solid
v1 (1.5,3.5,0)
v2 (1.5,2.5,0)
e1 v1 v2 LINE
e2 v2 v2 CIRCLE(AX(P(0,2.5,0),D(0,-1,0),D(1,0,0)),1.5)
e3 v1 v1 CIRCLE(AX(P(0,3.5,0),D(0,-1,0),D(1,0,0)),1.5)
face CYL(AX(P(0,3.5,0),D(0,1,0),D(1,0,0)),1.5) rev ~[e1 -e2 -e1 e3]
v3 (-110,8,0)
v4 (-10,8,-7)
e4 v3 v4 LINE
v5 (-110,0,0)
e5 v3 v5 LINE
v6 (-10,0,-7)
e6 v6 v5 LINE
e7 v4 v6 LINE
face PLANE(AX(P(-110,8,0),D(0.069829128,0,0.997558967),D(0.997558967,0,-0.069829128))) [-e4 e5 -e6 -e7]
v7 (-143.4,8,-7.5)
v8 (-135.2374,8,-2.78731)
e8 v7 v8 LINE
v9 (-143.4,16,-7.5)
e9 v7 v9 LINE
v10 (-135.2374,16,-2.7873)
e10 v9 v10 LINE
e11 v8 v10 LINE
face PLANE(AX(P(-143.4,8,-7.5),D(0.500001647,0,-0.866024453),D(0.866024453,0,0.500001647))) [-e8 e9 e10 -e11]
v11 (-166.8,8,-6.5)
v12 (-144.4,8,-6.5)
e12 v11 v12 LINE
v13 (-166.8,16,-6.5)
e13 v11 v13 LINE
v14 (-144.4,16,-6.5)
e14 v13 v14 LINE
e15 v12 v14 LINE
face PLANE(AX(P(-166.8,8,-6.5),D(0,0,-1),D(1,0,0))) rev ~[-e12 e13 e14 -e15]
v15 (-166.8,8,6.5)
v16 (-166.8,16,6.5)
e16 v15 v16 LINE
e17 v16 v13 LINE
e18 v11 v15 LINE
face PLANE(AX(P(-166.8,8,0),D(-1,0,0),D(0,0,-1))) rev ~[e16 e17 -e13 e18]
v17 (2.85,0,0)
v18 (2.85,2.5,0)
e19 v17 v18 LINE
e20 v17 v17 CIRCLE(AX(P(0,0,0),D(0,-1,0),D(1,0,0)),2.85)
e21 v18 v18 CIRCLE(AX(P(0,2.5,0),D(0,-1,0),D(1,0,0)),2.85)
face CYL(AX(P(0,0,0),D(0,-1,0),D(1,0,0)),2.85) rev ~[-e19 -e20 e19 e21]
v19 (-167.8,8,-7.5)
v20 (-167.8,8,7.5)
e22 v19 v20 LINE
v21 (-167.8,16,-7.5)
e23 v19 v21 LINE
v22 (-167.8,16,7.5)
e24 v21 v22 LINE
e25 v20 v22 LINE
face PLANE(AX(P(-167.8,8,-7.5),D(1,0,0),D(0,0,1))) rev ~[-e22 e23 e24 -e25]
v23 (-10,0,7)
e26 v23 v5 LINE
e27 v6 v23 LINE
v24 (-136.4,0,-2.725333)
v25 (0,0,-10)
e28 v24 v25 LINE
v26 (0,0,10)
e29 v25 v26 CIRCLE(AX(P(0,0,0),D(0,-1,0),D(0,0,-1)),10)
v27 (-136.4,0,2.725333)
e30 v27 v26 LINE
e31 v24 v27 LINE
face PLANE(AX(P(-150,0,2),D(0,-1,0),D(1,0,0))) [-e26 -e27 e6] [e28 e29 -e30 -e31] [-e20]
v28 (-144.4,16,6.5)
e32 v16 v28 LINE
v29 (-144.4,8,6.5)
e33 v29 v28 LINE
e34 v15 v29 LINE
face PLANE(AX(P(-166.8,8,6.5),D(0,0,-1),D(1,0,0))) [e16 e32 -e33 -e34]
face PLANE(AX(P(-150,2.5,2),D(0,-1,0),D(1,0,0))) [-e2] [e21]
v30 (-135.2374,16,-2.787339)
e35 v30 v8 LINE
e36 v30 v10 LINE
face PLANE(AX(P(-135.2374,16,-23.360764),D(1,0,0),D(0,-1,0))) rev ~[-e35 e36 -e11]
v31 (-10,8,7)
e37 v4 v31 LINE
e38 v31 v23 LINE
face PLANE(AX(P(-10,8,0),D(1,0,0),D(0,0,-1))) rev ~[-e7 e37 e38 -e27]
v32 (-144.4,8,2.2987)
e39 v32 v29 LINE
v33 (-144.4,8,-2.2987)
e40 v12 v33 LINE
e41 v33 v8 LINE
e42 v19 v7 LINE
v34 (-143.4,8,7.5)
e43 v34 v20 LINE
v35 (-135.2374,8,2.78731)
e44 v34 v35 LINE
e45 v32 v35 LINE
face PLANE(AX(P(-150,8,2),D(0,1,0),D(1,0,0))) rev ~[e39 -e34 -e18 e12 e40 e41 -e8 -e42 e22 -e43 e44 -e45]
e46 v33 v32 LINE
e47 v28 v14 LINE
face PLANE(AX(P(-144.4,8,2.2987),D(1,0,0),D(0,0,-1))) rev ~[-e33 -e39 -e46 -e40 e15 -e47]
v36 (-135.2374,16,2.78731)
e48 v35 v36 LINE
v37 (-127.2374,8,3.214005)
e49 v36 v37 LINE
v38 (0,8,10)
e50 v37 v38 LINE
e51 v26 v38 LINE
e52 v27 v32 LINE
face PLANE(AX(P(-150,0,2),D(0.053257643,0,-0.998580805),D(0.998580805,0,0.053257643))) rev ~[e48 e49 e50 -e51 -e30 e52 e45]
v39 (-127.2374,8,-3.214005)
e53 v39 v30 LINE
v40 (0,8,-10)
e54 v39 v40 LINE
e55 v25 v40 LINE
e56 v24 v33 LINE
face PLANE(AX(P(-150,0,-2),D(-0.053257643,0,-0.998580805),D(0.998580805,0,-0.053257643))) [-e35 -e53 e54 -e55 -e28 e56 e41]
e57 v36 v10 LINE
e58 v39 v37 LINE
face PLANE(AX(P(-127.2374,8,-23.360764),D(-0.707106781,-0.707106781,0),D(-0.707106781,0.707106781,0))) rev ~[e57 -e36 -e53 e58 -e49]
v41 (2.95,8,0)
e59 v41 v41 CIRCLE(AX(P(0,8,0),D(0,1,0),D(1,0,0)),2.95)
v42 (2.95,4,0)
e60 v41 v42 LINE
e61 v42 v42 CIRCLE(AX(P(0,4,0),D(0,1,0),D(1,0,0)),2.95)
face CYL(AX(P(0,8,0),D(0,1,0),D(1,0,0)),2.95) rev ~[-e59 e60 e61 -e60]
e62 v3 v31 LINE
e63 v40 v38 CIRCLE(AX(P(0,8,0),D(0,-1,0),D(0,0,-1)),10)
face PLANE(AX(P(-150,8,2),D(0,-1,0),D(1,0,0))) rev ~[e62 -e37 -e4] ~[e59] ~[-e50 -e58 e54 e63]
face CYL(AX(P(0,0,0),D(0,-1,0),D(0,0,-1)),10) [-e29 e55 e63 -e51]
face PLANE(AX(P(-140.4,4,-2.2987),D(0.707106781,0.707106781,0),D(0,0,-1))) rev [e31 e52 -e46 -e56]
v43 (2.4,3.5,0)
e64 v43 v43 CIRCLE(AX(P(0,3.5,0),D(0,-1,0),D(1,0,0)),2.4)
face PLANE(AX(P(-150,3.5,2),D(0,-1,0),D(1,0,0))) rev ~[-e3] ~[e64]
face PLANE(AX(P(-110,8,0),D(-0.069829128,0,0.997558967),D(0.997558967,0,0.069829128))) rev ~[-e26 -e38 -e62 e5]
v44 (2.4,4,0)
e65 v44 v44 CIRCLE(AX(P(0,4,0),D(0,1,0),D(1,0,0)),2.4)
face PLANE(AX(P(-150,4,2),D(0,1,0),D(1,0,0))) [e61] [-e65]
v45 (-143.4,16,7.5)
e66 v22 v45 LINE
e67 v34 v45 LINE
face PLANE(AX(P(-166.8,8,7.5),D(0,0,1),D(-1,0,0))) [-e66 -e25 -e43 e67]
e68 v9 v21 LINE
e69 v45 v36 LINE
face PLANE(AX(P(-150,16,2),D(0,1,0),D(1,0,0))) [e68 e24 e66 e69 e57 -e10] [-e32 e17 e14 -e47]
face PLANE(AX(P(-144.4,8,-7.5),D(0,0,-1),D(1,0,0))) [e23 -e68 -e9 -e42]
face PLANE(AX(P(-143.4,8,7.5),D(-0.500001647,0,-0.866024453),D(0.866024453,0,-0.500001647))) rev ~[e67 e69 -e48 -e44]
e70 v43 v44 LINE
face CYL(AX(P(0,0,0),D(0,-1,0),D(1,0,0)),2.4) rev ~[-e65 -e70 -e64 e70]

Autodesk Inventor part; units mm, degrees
ref_plane "YZ Plane" through (0, 0, 0) normal (1, 0, 0) x (0, 1, 0)
ref_plane "XZ Plane" through (0, 0, 0) normal (0, 1, 0) x (-1, 0, 0)
sketch "Szkic1" plane through (-150, 0, 2) normal (0, -1, 0) x (1, 0, 0)
  circle A0 centre (150, -2) radius 2.4
  line L0 (150, -2) -> (150, 8)
  line L1 (150, -2) -> (150, -12)
  arc A1 (150, -12) -> (150, 8) centre (150, -2) ccw
  line L2 (150, -2) -> (0, -2)
  line L3 (150, -2) -> (300, -2) construction
  line L4 (0, -2) -> (0, 0)
  line L5 (0, -2) -> (0, -4)
  line L6 (0, -4) -> (150, -12)
  line L7 (0, 0) -> (150, 8)
  dimension "d0" = 4.8
  dimension "d1" = 10
  dimension "d2" = 10
  dimension "d3" = 150
  dimension "d4" = 180
  dimension "d5" = 2
  dimension "d6" = 2
extrude "Wyciągnięcie proste1" add sketch "Szkic1" against normal blind 8 contours A0 L0 A1 L1 | A0 L2 L4 L7 L0 | L1 L6 L5 L2 A0
sketch "Szkic2" plane through (-150, 8, 2) normal (0, 1, 0) x (1, 0, 0)
  circle A0 centre (150, 2) radius 2.4
  circle A1 centre (150, 2) radius 2.95
  dimension "d9" = 5.9
extrude "Wyciągnięcie proste2" cut sketch "Szkic2" against normal blind 4
ref_plane "Płaszczyzna konstrukcyjna1" through (-150, 3.5, 2) normal (0, -1, 0) x (1, 0, 0)
sketch "Szkic4" plane through (-150, 3.5, 2) normal (0, -1, 0) x (1, 0, 0)
  circle A0 centre (150, -2) radius 1.5
  circle A1 centre (150, -2) radius 2.4
  dimension "d13" = 3
extrude "Wyciągnięcie proste3" add sketch "Szkic4" along normal blind 1
sketch "Szkic5" plane through (-150, 8, 2) normal (0, 1, 0) x (1, 0, 0)
  line L0 (129.6292, 9.8056) -> (142.004, 9.8056) construction
  line L1 (142.004, 9.8056) -> (142.004, -5.0441) construction
  line L2 (142.004, -5.0441) -> (129.6292, -5.0441) construction
  line L3 (129.6292, -5.0441) -> (129.6292, 9.8056) construction
  point P0 (150, 2)
sketch "Szkic6" plane through (-150, 8, 2) normal (0, 1, 0) x (1, 0, 0)
  circle A0 centre (150, 2) radius 1.5 projected
  line L0 (150, 2) -> (0, 2)
  line L1 (150, 2) -> (300, 2) construction
  line L2 (0, 2) -> (5.6, 2)
  line L3 (5.6, 2) -> (-16.8, 2)
  line L4 (5.6, 2) -> (-16.8, 2)
  line L5 (-16.8, 2) -> (-16.8, -4.5)
  line L6 (-16.8, -4.5) -> (5.6, -4.5)
  line L7 (5.6, -4.5) -> (5.6, 2)
  line L8 (5.6, 2) -> (-16.8, 2)
  line L9 (-16.8, 2) -> (-16.8, 8.5)
  line L10 (-16.8, 8.5) -> (5.6, 8.5)
  line L11 (5.6, 8.5) -> (5.6, 2)
  line L12 (5.6, 8.5) -> (5.6, 9.5)
  line L13 (5.6, 9.5) -> (6.6, 9.5)
  line L14 (-16.8, -4.5) -> (-16.8, -5.5)
  line L15 (-16.8, -5.5) -> (-17.8, -5.5)
  line L16 (-17.8, -5.5) -> (6.6, -5.5)
  line L17 (6.6, -5.5) -> (6.6, 9.5)
  line L18 (6.6, 9.5) -> (-17.8, 9.5)
  line L19 (-17.8, 9.5) -> (-17.8, -5.5)
  line L20 (6.6, -5.5) -> (14.7626, -0.7873)
  line L21 (150, -8) -> (0, 0) projected
  line L22 (6.6, -5.5) -> (16.0253, -5.5) construction
  line L23 (6.6, 9.5) -> (14.7626, 4.7873)
  line L24 (14.7626, -0.7873) -> (14.7626, 4.7873)
  point P0 (5.6, 9.5)
  dimension "d16" = 150
  dimension "d17" = 180
  dimension "d18" = 5.6
  dimension "d19" = 22.4
  dimension "d20" = 6.5
  dimension "d21" = 6.5
  dimension "d22" = 1
  dimension "d23" = 1
  dimension "d24" = 1
  dimension "d25" = 1
  dimension "d26" = 30
extrude "Wyciągnięcie proste4" add sketch "Szkic6" along normal blind 8 contours L11 L12 L13 L17 L0 | L0 L17 L21 L7 | L17 L23 L24 L0 | L0 L24 L21 L17 | L21 L17 L16 L14 L6 L7 | L10 L9 L5 L14 L15 L19 L18 L12 | L21 L20 L17
sketch "Szkic7" plane through (-150, 8, 2) normal (0, 1, 0) x (1, 0, 0)
  circle A0 centre (150, 2) radius 1.5 projected
  line L0 (150, 2) -> (140, 2)
  line L1 (140, 2) -> (140, -5)
  line L2 (140, 2) -> (140, 9)
  line L3 (140, 2) -> (40, 2)
  line L4 (40, 2) -> (140, 9)
  line L5 (40, 2) -> (140, -5)
  line L6 (5.6, -0.2987) -> (5.6, 4.2987) projected
  line L7 (5.6, 4.2987) -> (5.6, -0.2987)
  line L8 (0, 0) -> (5.6, -0.2987) projected
  line L9 (5.6, -0.2987) -> (0, 0)
  line L10 (0, 0) -> (0, 4.0412)
  line L11 (0, 4.0412) -> (5.6, 4.2987)
  dimension "d29" = 10
  dimension "d30" = 7
  dimension "d31" = 7
  dimension "d32" = 100
extrude "Wyciągnięcie proste5" cut sketch "Szkic7" against normal through all contours L3 L4 L2 | L1 L5 L3 | L8 L10 L11 L6
chamfer "Faza1" distance 8 angle 45 1 edges at (-135.2374, 8, 0)
chamfer "Faza2" distance 8 angle 45 1 edges at (-144.4, 0, 0)
sketch "Szkic8" plane through (-150, 0, 2) normal (0, -1, 0) x (1, 0, 0)
  circle A0 centre (150, -2) radius 2.4 projected
  line L0 (150, -2) -> (0, -2)
  circle A1 centre (0, -2) radius 2
  dimension "d41" = 150
  dimension "d42" = 4
sketch "Szkic9" plane through (-150, 8, 2) normal (0, -1, 0) x (1, 0, 0)
  point P0 (150, -2)
sketch "Szkic10" plane through (-150, 0, 2) normal (0, -1, 0) x (1, 0, 0)
  circle A0 centre (150, -2) radius 2.85
  dimension "d43" = 5.7
extrude "Wyciągnięcie proste6" cut sketch "Szkic10" against normal blind 2.5
properties part number "pointrer"
